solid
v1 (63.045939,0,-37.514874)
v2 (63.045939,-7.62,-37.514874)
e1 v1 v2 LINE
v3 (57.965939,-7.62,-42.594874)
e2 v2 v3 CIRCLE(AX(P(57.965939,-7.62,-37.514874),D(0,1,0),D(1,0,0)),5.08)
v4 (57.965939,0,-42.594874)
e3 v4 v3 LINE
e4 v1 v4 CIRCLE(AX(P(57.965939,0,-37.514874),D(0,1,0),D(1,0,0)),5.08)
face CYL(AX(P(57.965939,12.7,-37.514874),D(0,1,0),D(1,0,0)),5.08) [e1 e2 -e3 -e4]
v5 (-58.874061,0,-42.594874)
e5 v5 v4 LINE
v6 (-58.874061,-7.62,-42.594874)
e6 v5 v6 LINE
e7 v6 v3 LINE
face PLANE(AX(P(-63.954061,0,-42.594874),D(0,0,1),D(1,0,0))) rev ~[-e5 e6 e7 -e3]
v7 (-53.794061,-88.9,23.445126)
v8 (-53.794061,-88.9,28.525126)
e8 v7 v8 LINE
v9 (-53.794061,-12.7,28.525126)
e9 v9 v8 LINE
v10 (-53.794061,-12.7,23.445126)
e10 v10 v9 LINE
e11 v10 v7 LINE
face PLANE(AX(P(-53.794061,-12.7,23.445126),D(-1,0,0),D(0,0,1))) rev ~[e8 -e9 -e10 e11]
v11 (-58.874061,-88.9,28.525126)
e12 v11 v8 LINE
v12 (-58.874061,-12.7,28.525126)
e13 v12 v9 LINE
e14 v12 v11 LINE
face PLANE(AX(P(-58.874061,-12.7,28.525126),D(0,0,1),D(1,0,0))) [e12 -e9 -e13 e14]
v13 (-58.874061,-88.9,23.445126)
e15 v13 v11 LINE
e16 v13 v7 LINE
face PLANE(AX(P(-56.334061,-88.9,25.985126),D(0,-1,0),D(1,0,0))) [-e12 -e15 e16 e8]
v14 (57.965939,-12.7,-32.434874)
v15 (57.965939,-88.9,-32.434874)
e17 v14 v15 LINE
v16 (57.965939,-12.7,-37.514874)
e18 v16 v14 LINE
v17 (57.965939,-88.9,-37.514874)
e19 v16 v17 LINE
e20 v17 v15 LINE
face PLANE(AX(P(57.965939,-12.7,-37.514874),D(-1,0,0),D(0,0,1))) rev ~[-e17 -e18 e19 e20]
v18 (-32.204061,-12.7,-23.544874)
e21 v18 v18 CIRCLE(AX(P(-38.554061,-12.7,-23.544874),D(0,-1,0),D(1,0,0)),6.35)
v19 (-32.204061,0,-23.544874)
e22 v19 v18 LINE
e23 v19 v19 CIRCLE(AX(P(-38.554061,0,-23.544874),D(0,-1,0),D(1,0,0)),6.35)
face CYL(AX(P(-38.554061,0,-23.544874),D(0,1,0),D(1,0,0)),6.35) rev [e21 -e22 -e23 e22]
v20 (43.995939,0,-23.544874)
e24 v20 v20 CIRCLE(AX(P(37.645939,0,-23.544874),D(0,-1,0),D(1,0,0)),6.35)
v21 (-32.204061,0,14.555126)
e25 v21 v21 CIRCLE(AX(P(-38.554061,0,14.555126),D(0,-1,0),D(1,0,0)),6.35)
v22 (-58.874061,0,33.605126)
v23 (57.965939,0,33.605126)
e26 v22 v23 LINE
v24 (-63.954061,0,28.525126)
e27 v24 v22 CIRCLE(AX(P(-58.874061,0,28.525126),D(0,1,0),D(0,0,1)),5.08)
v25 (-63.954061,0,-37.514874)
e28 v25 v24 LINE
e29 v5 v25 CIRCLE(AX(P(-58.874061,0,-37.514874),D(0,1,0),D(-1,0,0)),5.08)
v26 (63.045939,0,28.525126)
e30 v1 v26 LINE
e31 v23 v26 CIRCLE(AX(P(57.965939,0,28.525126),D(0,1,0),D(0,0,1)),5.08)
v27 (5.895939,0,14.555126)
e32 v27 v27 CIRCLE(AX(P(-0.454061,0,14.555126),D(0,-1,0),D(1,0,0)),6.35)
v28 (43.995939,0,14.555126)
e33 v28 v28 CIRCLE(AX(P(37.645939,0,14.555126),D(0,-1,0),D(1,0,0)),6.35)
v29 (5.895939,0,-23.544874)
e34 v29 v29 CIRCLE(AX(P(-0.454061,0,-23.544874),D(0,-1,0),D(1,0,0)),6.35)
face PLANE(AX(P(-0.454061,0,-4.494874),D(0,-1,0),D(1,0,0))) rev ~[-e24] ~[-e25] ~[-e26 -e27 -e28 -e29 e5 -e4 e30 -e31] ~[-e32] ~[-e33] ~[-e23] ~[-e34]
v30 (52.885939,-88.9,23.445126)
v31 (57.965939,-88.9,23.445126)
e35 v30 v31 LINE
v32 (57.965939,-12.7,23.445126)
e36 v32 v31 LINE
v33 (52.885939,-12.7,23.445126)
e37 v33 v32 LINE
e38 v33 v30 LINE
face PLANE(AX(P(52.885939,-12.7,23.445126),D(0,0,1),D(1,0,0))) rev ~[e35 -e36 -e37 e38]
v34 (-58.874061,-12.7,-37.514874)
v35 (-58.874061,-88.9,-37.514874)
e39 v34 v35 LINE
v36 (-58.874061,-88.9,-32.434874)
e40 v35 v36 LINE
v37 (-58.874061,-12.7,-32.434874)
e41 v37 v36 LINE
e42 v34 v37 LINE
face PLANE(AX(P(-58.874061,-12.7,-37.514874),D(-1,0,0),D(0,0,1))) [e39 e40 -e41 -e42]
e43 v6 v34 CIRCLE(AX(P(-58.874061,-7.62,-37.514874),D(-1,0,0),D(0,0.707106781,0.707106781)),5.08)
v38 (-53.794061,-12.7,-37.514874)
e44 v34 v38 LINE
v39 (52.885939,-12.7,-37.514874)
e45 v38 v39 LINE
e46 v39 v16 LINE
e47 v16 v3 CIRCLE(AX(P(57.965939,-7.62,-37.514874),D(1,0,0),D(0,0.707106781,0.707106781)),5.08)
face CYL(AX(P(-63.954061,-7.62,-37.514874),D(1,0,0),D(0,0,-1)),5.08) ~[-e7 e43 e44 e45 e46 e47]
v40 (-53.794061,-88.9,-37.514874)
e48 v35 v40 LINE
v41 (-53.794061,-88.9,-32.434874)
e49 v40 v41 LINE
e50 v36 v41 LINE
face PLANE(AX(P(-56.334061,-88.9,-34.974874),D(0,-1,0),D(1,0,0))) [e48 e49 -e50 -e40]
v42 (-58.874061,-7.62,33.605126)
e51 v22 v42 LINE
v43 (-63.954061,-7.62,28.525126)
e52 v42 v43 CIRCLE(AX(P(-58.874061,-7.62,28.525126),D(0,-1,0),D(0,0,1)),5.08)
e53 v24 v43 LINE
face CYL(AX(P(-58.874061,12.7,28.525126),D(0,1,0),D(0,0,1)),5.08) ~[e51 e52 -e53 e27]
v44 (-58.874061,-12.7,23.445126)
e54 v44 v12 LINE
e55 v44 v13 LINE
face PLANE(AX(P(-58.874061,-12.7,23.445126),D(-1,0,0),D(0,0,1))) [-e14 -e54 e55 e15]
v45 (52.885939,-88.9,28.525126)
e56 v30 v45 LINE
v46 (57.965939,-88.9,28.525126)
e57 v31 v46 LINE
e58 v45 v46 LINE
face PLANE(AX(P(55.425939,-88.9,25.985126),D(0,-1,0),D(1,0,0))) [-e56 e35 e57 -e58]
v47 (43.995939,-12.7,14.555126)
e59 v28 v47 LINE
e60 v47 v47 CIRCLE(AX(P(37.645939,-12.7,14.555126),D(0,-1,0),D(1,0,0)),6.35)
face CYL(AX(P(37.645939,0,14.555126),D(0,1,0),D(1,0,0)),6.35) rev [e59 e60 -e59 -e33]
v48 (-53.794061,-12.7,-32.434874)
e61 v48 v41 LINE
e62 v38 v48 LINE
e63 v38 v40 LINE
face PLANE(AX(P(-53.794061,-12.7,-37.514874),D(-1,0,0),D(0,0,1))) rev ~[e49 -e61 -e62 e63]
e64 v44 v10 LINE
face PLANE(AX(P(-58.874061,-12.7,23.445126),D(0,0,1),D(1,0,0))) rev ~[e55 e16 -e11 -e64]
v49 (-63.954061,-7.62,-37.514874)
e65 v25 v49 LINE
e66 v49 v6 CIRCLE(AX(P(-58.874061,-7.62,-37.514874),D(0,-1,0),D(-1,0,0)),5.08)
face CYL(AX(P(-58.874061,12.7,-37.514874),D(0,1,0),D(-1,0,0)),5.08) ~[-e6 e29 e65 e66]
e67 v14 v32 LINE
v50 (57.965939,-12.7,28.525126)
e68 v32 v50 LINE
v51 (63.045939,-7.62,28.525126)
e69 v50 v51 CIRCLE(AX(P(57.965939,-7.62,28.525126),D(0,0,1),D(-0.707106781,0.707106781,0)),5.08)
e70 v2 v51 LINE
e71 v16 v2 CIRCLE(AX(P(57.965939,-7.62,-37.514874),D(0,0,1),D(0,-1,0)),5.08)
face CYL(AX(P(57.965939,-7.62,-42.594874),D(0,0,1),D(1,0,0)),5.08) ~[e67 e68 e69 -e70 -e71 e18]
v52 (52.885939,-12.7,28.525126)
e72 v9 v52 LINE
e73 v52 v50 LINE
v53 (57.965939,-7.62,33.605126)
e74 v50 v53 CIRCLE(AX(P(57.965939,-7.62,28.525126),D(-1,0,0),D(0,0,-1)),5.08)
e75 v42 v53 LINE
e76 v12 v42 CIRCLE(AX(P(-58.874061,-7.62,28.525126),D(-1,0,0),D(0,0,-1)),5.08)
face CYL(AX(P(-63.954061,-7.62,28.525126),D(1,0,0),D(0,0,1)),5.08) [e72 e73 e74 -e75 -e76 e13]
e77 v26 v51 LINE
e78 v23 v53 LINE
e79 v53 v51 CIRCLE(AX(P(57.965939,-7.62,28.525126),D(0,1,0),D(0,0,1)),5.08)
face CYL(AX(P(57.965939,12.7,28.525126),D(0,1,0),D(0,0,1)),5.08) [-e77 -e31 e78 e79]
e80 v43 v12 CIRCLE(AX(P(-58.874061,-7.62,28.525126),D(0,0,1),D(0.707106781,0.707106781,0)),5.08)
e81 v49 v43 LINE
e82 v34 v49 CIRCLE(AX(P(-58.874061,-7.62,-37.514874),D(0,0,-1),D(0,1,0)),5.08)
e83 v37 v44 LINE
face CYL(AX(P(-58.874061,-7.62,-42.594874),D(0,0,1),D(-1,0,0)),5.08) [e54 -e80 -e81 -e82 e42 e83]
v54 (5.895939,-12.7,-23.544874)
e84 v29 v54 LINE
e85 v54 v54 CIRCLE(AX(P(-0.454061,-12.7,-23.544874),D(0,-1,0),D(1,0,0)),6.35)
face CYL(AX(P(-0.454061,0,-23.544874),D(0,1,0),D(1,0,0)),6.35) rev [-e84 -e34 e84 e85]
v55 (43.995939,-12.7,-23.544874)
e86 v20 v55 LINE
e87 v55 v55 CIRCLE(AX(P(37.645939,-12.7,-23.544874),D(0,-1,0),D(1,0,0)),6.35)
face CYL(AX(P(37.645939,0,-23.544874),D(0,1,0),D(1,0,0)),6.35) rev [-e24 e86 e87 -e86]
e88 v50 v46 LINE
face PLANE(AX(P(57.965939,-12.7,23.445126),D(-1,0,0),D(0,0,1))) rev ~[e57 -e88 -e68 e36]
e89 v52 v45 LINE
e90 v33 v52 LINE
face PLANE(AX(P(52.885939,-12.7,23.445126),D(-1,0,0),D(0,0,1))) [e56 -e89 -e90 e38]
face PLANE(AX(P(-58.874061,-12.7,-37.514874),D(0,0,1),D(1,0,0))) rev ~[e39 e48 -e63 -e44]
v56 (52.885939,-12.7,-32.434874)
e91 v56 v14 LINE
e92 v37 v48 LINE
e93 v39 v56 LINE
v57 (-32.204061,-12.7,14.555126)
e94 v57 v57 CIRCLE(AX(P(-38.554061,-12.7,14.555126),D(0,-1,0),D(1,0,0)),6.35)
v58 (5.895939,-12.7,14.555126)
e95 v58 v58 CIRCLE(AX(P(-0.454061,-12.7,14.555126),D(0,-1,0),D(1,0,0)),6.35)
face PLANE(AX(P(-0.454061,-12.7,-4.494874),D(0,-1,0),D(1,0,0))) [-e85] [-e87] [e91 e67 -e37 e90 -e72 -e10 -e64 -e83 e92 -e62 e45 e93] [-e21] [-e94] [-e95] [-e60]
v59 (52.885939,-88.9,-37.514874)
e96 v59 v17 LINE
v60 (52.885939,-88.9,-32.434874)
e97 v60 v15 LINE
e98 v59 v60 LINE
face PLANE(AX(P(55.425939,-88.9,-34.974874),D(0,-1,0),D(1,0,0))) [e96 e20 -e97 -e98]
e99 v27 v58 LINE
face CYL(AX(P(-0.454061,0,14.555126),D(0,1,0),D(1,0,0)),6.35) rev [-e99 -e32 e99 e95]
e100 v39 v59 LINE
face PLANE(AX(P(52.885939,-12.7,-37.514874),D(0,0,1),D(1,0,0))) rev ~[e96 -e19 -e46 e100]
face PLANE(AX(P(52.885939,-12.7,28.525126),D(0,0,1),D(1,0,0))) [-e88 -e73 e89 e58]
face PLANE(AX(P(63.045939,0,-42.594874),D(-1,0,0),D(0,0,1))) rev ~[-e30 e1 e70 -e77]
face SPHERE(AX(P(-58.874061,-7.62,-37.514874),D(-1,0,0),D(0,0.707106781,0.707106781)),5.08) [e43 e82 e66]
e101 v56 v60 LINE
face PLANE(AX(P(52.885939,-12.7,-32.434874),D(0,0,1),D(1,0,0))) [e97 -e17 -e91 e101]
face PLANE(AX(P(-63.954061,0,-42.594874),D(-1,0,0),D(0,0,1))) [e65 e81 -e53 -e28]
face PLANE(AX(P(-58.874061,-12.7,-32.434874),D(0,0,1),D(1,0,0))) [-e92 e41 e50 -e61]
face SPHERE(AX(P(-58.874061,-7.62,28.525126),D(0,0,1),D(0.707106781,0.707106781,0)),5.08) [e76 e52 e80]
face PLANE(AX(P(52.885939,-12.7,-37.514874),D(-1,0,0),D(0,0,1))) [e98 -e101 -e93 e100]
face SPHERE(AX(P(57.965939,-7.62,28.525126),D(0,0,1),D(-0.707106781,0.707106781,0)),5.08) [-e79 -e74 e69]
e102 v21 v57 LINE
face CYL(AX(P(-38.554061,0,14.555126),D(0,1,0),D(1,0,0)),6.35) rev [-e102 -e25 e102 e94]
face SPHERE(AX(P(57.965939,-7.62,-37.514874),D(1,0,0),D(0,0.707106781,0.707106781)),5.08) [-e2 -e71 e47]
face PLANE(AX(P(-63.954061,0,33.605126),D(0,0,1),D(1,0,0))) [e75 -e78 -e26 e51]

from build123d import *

# Parameters (mm, degrees)
F0_W         = 127
F0_H         = 76.2
F0_R         = 6.35
F1_DEPTH     = 12.7
F2_R         = 5.08
F3_T1_DEPTH  = 20.32
F3_S5_W      = 5.08
F3_S5_H      = 5.08
F3_T6_DEPTH  = 5.08
F3_S11_W     = 5.08
F3_S11_H     = 5.08
F3_T12_DEPTH = 5.08
F3_S17_W     = 5.08
F3_S17_H     = 5.08
F3_T18_DEPTH = 5.08
F3_S23_W     = 5.08
F3_S23_H     = 5.08
F3_T24_DEPTH = 5.08
F4_W         = 5.08
F4_H         = 5.08
F5_DEPTH     = 76.2


# Not quite as in the source:
# - a fillet or chamfer that OpenCascade refuses, or shapes differently, is made with other operations: its cross-section is extruded or revolved along the edge and cut away or added


with BuildPart() as f1:
    # F0 (on Front) → F1 (new body)
    with BuildSketch(Plane.XZ):
        with Locations((-0.4540607333, -4.4948741291)):
            Rectangle(F0_W, F0_H)
        with Locations((-38.5540607333, -23.5448741291)):
            Circle(F0_R, mode=Mode.SUBTRACT)
        with Locations((-0.4540607333, -23.5448741291)):
            Circle(F0_R, mode=Mode.SUBTRACT)
        with Locations((37.6459392667, -23.5448741291)):
            Circle(F0_R, mode=Mode.SUBTRACT)
        with Locations((-38.5540607333, 14.5551258709)):
            Circle(F0_R, mode=Mode.SUBTRACT)
        with Locations((-0.4540607333, 14.5551258709)):
            Circle(F0_R, mode=Mode.SUBTRACT)
        with Locations((37.6459392667, 14.5551258709)):
            Circle(F0_R, mode=Mode.SUBTRACT)
    extrude(amount=F1_DEPTH)

    # F2
    f2_edges = [f1.edges().sort_by_distance(p)[0] for p in [
        (-0.454061, -12.7, 33.605126),
        (-63.954061, -12.7, -4.494874),
        (-0.454061, -12.7, -42.594874),
        (63.045939, -12.7, -4.494874),
    ]]
    fillet(f2_edges, radius=F2_R)

    # F3: fillet of radius 5.08 on 4 edges, made by hand

    # F3_s2 → F3_t1 (cut)
    with BuildSketch(Plane.XZ.offset(-12.7)):
        with BuildLine():
            ThreePointArc((-63.9540607333, -37.5148741291), (-62.4661631817, -41.1069765775), (-58.8740607333, -42.5948741291))
            Line((-58.8740607333, -42.5948741291), (-63.9540607333, -42.5948741291))
            Line((-63.9540607333, -42.5948741291), (-63.9540607333, -37.5148741291))
        make_face()
        with BuildLine():
            ThreePointArc((63.0459392667, -37.5148741291), (61.5580417151, -41.1069765775), (57.9659392667, -42.5948741291))
            Line((57.9659392667, -42.5948741291), (63.0459392667, -42.5948741291))
            Line((63.0459392667, -42.5948741291), (63.0459392667, -37.5148741291))
        make_face()
        with BuildLine():
            ThreePointArc((57.9659392667, 33.6051258709), (61.5580417151, 32.1172283193), (63.0459392667, 28.5251258709))
            Line((63.0459392667, 28.5251258709), (63.0459392667, 33.6051258709))
            Line((63.0459392667, 33.6051258709), (57.9659392667, 33.6051258709))
        make_face()
        with BuildLine():
            ThreePointArc((-58.8740607333, 33.6051258709), (-62.4661631817, 32.1172283193), (-63.9540607333, 28.5251258709))
            Line((-63.9540607333, 28.5251258709), (-63.9540607333, 33.6051258709))
            Line((-63.9540607333, 33.6051258709), (-58.8740607333, 33.6051258709))
        make_face()
    extrude(amount=F3_T1_DEPTH, mode=Mode.SUBTRACT)


with BuildPart() as f3_tool4:
    # F3_s5 → F3_t6 (new body)
    with BuildSketch(Plane.XY.offset(28.5251258709)):
        with Locations((-61.4140607333, -10.16)):
            Rectangle(F3_S5_W, F3_S5_H)
    extrude(amount=F3_T6_DEPTH)

    # F3_s7 → F3_t8 (revolve, cut)
    with BuildSketch(Plane(origin=(-58.8740607333, -7.62, 28.5251258709), x_dir=(0.7071067812, 0.7071067812, 0), z_dir=(0.7071067812, -0.7071067812, 0))):
        with BuildLine():
            ThreePointArc((0, -5.08), (5.08, 0), (0, 5.08))
            Line((0, 5.08), (0, -5.08))
        make_face()
    revolve(axis=Axis((-58.8740607333, -7.62, 28.5251258709), (0, 0, 1)), mode=Mode.SUBTRACT)


with BuildPart() as f1_1:
    add(f1.part)

    # F3_t3: cut F3_tool4
    add(f3_tool4.part, mode=Mode.SUBTRACT)


with BuildPart() as f3_tool10:
    # F3_s11 → F3_t12 (new body)
    with BuildSketch(Plane.XY.offset(28.5251258709)):
        with Locations((60.5059392667, -10.16)):
            Rectangle(F3_S11_W, F3_S11_H)
    extrude(amount=F3_T12_DEPTH)

    # F3_s13 → F3_t14 (revolve, cut)
    with BuildSketch(Plane(origin=(57.9659392667, -7.62, 28.5251258709), x_dir=(-0.7071067812, 0.7071067812, 0), z_dir=(0.7071067812, 0.7071067812, 0))):
        with BuildLine():
            ThreePointArc((0, -5.08), (5.08, 0), (0, 5.08))
            Line((0, 5.08), (0, -5.08))
        make_face()
    revolve(axis=Axis((57.9659392667, -7.62, 28.5251258709), (0, 0, 1)), mode=Mode.SUBTRACT)


with BuildPart() as f1_2:
    add(f1_1.part)

    # F3_t9: cut F3_tool10
    add(f3_tool10.part, mode=Mode.SUBTRACT)


with BuildPart() as f3_tool16:
    # F3_s17 → F3_t18 (new body)
    with BuildSketch(Plane.YZ.offset(57.9659392667)):
        with Locations((-10.16, -40.0548741291)):
            Rectangle(F3_S17_W, F3_S17_H)
    extrude(amount=F3_T18_DEPTH)

    # F3_s19 → F3_t20 (revolve, cut)
    with BuildSketch(Plane(origin=(57.9659392667, -7.62, -37.5148741291), x_dir=(0, 0.7071067812, 0.7071067812), z_dir=(0, 0.7071067812, -0.7071067812))):
        with BuildLine():
            ThreePointArc((0, -5.08), (5.08, 0), (0, 5.08))
            Line((0, 5.08), (0, -5.08))
        make_face()
    revolve(axis=Axis((57.9659392667, -7.62, -37.5148741291), (1, 0, 0)), mode=Mode.SUBTRACT)


with BuildPart() as f1_3:
    add(f1_2.part)

    # F3_t15: cut F3_tool16
    add(f3_tool16.part, mode=Mode.SUBTRACT)


with BuildPart() as f3_tool22:
    # F3_s23 → F3_t24 (new body)
    with BuildSketch(Plane.YZ.offset(-58.8740607333)):
        with Locations((-10.16, -40.0548741291)):
            Rectangle(F3_S23_W, F3_S23_H)
    extrude(amount=-F3_T24_DEPTH)

    # F3_s25 → F3_t26 (revolve, cut)
    with BuildSketch(Plane(origin=(-58.8740607333, -7.62, -37.5148741291), x_dir=(0, 0.7071067812, 0.7071067812), z_dir=(0, -0.7071067812, 0.7071067812))):
        with BuildLine():
            ThreePointArc((0, -5.08), (5.08, 0), (0, 5.08))
            Line((0, 5.08), (0, -5.08))
        make_face()
    revolve(axis=Axis((-58.8740607333, -7.62, -37.5148741291), (-1, 0, 0)), mode=Mode.SUBTRACT)


with BuildPart() as f1_4:
    add(f1_3.part)

    # F3_t21: cut F3_tool22
    add(f3_tool22.part, mode=Mode.SUBTRACT)

    # F4 (on face) → F5 (join)
    with BuildSketch(Plane.XZ.offset(12.7)):
        with Locations((-56.3340607333, -34.9748741291)):
            Rectangle(F4_W, F4_H)
        with Locations((55.4259392667, -34.9748741291)):
            Rectangle(F4_W, F4_H)
        with Locations((55.4259392667, 25.9851258709)):
            Rectangle(F4_W, F4_H)
        with Locations((-56.3340607333, 25.9851258709)):
            Rectangle(F4_W, F4_H)
    extrude(amount=F5_DEPTH)


solid = f1_4.part
